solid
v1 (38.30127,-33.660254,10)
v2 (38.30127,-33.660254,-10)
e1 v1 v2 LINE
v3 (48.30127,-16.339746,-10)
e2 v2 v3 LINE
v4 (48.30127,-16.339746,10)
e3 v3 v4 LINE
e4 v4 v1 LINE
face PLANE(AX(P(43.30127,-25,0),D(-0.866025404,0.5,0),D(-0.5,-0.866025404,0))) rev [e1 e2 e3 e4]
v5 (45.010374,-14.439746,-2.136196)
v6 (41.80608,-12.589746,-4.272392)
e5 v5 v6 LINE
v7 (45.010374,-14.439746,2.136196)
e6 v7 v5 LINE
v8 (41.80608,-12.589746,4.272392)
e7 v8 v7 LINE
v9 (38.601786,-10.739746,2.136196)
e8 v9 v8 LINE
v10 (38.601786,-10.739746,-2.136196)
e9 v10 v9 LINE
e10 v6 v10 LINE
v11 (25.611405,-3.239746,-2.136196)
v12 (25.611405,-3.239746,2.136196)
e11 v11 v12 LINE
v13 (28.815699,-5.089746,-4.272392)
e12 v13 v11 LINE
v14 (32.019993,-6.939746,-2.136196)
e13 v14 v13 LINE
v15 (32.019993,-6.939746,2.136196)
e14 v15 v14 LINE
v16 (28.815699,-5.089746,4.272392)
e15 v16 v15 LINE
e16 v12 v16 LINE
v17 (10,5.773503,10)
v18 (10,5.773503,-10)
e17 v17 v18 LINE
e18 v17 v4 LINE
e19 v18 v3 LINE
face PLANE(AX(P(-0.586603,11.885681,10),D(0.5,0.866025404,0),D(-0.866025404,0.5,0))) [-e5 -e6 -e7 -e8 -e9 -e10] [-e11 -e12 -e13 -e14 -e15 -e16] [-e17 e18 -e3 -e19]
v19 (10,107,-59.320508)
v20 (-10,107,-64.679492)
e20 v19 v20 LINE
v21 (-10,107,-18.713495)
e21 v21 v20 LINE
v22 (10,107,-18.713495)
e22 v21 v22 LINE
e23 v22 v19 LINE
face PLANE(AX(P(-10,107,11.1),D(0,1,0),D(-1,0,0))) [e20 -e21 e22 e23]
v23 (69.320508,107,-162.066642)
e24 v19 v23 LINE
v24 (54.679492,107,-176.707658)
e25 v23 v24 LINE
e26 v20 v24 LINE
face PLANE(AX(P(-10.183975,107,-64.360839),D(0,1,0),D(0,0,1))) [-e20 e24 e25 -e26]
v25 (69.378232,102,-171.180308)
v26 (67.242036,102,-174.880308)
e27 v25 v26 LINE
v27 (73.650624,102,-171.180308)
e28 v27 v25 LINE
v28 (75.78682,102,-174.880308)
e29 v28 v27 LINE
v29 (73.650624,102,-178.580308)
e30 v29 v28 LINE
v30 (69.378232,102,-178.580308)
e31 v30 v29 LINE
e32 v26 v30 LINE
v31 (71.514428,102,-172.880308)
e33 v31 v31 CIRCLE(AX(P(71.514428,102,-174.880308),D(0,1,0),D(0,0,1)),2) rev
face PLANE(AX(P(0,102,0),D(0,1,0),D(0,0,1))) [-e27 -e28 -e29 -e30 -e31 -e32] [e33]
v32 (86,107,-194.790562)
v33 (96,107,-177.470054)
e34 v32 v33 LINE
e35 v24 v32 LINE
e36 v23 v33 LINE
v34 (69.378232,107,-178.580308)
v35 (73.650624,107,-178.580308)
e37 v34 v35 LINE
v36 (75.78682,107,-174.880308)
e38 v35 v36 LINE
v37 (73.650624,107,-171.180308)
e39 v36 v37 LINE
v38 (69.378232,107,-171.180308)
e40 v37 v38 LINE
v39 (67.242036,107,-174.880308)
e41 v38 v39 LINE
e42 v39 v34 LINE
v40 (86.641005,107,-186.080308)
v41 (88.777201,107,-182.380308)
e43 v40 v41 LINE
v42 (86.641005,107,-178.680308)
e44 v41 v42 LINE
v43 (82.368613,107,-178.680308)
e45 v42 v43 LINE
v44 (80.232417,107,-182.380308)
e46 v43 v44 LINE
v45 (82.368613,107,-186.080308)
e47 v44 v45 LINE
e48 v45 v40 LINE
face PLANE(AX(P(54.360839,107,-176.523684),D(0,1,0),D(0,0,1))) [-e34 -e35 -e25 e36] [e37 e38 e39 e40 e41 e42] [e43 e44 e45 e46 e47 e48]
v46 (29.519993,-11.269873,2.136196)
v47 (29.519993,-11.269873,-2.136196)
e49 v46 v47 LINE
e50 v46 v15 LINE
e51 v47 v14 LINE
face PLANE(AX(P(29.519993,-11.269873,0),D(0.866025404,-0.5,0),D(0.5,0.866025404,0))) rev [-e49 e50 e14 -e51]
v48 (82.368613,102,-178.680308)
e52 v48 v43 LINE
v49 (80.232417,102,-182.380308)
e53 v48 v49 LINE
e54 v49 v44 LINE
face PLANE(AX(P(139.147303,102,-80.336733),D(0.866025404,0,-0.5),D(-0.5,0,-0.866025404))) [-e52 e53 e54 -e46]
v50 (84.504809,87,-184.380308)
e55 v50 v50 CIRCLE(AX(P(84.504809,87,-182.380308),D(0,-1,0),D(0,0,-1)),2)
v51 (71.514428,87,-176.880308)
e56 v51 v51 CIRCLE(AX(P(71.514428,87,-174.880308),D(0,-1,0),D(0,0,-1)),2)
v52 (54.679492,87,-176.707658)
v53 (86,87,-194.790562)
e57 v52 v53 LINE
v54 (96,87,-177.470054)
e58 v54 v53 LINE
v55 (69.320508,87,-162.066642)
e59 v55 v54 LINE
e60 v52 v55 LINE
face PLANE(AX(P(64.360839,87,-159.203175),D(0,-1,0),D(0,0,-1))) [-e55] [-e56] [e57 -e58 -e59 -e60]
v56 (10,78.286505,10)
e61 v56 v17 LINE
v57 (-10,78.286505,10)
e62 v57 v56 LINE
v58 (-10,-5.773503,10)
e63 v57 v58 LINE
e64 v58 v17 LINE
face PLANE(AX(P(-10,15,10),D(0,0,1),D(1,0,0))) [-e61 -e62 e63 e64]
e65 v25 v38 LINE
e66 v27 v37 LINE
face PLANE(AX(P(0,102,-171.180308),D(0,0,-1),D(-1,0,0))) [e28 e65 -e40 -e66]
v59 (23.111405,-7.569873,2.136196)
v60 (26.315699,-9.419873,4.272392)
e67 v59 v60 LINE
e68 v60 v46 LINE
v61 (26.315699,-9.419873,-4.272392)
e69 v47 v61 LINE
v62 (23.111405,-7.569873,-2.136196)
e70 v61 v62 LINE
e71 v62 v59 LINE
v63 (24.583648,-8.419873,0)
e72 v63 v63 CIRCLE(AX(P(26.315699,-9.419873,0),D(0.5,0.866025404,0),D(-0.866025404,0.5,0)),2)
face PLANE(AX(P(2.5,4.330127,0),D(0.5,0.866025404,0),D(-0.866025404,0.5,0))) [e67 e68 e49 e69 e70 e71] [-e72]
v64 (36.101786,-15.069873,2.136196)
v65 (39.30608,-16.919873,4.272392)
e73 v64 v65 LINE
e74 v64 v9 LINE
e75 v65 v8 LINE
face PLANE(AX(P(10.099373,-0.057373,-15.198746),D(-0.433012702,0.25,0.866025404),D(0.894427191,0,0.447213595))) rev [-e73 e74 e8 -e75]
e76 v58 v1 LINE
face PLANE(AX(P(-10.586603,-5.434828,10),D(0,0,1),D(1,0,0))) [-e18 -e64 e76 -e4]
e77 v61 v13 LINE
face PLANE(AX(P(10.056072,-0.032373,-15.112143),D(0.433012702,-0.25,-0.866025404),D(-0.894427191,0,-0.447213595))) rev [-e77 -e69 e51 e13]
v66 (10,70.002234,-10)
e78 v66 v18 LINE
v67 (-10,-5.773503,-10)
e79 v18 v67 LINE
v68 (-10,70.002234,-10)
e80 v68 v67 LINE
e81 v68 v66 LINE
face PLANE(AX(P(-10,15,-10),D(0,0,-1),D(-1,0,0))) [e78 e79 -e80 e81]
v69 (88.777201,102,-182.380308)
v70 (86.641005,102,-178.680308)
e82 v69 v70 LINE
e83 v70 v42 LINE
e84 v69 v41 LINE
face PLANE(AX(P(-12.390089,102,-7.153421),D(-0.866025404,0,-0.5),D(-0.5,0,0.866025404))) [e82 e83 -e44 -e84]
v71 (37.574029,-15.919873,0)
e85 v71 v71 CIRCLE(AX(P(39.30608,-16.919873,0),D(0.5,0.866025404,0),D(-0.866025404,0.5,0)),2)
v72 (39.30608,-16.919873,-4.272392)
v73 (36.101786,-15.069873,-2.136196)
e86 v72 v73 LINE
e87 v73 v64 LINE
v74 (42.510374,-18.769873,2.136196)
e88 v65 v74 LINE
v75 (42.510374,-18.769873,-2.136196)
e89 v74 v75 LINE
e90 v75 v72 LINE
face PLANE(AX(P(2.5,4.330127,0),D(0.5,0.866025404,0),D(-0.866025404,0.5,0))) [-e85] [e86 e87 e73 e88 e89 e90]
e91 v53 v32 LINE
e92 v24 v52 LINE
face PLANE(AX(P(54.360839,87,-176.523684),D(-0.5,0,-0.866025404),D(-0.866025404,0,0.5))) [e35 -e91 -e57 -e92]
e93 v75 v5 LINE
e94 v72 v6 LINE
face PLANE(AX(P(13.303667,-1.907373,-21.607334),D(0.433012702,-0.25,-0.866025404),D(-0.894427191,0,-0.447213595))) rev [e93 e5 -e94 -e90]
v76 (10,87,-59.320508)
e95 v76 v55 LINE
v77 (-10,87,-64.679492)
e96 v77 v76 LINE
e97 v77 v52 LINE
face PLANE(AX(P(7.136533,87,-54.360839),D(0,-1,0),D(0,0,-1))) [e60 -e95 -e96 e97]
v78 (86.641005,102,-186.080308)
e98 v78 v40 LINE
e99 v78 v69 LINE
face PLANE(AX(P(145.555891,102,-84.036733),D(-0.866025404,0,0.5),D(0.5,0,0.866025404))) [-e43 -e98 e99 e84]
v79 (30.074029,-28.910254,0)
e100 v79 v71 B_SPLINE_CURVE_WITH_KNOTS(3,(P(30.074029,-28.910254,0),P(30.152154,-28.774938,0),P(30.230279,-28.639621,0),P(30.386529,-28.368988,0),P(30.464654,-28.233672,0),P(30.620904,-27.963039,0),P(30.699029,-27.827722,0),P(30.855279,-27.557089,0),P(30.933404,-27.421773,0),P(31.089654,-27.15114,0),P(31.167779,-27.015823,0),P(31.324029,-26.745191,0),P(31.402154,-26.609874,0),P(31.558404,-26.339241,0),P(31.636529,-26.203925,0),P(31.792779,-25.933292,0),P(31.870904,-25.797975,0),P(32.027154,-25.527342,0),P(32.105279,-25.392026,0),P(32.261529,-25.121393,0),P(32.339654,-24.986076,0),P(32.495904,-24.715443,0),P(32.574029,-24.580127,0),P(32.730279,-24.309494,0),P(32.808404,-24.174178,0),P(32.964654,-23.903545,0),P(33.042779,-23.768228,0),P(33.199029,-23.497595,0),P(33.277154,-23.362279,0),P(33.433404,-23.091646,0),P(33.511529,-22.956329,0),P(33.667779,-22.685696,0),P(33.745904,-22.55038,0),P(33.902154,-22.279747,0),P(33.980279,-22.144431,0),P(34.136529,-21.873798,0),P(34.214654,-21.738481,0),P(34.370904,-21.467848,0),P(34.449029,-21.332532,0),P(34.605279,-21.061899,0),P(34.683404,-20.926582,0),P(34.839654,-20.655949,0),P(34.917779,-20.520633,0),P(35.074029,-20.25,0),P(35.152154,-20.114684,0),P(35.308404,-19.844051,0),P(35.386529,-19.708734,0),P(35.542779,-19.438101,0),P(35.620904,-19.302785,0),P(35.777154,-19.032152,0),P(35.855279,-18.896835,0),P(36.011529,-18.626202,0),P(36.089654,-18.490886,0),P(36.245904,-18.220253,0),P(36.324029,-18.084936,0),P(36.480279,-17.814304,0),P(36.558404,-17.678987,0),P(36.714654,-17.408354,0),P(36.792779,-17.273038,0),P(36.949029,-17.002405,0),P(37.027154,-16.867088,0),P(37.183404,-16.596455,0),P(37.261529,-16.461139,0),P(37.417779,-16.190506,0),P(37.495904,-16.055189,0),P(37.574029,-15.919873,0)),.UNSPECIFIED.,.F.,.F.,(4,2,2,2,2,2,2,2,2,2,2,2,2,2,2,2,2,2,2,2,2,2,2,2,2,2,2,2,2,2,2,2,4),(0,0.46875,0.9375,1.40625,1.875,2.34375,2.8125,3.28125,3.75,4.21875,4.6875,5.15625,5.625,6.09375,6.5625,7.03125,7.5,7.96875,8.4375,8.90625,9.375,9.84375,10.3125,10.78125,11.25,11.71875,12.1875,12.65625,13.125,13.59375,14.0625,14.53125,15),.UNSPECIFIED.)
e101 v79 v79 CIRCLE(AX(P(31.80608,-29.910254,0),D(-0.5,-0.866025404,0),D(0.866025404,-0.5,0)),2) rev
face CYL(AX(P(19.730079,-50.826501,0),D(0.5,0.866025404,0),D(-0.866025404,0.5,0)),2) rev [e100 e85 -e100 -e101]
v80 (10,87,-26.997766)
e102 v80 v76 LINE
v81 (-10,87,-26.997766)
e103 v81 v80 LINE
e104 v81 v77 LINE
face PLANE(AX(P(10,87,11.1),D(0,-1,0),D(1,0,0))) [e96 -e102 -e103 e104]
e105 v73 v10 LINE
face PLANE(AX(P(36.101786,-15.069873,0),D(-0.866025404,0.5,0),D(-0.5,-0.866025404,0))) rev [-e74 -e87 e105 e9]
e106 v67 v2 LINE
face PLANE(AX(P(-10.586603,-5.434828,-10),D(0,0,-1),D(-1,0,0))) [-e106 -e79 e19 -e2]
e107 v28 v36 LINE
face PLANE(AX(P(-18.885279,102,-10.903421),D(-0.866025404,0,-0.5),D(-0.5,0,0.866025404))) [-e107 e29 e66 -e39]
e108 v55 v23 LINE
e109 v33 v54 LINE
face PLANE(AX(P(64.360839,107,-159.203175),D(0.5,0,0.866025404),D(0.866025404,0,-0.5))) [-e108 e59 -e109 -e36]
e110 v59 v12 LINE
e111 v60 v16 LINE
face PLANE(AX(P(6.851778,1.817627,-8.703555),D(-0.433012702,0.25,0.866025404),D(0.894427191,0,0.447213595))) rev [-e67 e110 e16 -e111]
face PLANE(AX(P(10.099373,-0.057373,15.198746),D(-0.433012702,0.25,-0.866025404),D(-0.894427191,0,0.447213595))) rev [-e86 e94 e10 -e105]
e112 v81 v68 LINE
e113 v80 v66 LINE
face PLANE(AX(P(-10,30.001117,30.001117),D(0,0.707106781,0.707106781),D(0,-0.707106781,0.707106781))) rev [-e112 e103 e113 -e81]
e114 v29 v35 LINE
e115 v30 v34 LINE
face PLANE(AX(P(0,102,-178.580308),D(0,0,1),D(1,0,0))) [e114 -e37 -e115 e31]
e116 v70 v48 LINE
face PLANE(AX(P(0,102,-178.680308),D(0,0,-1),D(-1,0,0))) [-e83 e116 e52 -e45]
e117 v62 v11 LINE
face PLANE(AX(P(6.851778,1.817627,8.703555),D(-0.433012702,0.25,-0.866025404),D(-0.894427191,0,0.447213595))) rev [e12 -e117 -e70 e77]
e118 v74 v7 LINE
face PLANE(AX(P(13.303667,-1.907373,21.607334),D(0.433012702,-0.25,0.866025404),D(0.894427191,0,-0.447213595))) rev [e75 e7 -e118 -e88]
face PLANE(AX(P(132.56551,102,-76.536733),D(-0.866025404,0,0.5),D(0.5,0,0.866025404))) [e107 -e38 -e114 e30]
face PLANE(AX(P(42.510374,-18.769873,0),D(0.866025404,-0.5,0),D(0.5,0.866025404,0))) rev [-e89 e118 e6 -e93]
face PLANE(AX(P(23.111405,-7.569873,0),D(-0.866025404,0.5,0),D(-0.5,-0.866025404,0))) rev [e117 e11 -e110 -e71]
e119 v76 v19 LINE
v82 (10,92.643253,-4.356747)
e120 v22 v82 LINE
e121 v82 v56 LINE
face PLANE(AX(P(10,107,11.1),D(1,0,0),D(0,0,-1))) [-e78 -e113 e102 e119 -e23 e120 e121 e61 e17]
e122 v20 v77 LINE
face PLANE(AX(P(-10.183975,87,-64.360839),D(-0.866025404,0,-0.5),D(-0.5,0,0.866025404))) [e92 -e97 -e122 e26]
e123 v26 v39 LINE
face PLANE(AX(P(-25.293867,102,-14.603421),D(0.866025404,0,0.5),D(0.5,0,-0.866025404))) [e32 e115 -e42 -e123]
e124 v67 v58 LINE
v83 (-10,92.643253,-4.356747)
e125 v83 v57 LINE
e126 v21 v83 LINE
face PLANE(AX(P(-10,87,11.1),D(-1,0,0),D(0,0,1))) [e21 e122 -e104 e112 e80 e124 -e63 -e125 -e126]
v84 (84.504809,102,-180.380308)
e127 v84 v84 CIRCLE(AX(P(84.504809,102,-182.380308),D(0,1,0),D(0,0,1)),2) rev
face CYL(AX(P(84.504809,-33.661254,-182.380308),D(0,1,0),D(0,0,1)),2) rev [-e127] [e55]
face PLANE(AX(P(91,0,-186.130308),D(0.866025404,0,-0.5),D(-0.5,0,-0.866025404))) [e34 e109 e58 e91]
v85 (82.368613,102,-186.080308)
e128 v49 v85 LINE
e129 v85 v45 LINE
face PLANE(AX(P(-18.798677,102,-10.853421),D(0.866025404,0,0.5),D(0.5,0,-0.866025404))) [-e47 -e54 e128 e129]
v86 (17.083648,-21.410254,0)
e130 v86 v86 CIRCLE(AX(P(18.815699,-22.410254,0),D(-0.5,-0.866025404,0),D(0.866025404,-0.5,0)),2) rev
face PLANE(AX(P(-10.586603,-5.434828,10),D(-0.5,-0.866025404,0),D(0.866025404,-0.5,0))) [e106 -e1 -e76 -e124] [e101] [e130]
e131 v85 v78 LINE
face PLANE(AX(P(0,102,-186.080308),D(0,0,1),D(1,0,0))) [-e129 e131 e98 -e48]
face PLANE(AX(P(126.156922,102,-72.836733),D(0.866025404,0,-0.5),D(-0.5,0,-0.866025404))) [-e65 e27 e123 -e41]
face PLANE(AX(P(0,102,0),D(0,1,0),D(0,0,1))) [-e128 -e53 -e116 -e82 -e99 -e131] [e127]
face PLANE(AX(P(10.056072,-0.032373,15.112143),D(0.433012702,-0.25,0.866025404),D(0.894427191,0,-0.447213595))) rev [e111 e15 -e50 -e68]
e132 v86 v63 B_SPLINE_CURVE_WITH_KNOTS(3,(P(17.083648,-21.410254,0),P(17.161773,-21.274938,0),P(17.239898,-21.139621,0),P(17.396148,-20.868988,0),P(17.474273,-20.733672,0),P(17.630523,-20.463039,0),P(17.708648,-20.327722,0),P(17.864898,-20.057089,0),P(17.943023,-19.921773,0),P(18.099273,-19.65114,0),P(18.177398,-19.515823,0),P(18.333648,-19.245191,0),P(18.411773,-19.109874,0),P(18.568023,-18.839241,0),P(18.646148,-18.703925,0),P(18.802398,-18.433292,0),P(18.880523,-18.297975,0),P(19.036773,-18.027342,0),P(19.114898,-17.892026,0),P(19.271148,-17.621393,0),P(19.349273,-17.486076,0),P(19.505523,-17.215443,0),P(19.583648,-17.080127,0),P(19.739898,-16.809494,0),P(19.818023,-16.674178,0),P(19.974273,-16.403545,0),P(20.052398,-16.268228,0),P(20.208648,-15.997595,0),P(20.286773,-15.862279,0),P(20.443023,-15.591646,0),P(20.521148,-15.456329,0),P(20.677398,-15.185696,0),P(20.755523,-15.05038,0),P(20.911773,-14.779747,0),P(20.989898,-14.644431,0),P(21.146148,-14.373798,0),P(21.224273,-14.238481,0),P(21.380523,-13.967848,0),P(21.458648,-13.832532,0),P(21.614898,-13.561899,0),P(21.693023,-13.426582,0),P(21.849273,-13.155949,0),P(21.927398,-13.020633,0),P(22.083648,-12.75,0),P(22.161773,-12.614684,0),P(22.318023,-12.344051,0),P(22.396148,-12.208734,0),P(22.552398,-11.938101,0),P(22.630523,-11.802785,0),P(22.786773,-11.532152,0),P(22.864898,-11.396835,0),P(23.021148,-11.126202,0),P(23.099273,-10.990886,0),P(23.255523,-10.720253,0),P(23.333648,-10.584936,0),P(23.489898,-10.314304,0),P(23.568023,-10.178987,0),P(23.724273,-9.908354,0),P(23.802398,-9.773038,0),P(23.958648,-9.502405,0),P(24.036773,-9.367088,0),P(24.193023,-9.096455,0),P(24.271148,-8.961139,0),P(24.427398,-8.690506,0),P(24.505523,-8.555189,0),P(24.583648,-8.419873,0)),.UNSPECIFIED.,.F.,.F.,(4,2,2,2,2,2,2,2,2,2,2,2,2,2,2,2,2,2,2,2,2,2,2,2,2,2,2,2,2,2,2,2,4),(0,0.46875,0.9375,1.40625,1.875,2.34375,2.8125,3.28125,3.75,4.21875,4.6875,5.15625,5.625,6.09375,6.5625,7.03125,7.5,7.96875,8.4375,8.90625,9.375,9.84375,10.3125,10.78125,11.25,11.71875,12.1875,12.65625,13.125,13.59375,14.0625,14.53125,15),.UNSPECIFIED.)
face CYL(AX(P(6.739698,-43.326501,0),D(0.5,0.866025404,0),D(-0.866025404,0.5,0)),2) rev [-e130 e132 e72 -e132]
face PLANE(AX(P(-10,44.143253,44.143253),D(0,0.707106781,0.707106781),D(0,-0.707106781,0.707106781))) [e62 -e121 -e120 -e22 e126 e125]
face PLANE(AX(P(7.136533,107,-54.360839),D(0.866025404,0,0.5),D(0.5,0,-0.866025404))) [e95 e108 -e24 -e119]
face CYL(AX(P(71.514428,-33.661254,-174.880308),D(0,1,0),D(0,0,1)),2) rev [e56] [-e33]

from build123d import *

# Parameters (mm, degrees)
SKETCH4_W           = 20
SKETCH4_H           = 20
SWEEP2_START        = -10
SWEEP2_OUTLINE_W    = 20
SWEEP2_OUTLINE_H    = 92
SWEEP2_DEPTH        = 20
SWEEP2_START_2      = -15
SWEEP2_2_OUTLINE_W  = 20
SWEEP2_2_OUTLINE_H  = 20
SWEEP2_2_DEPTH      = 5
SWEEP3_START        = 87
SWEEP3_DEPTH        = 20
CUT_EXTRUDE3_REACH  = 238.421
SKETCH5_R           = 2
SKETCH5_3_R         = 2
CUT_EXTRUDE4_DEPTH  = 5
CUT_EXTRUDE5_REACH  = 208.616
SKETCH6_R           = 2
SKETCH6_5_R         = 2
CUT_EXTRUDE6_DEPTH  = 5
CUT_EXTRUDE7_DEPTH  = 239.303090645
BOSS_EXTRUDE1_DEPTH = 20


# Read off the part's stored shape, not the designer's step: Sweep2, Sweep3
with BuildPart() as part:
    # Sweep1: sweep along a path in Sketch1
    with BuildLine(Plane.XY) as sweep1_path:
        Line((43.301270189, -25), (0, 0))
        Line((0, 0), (0, 15))
    # Sketch4 → Sweep1 (sweep)
    with BuildSketch(Plane(origin=(43.301270189, -25, 0), x_dir=(0, 0, -1), z_dir=(0.8660254037844382, -0.5000000000000011, 0))):
        Rectangle(SKETCH4_W, SKETCH4_H)
    sweep(path=sweep1_path.line, transition=Transition.RIGHT)

    # Sweep2 outline → Sweep2 (add)
    with BuildSketch(Plane.XY.offset(SWEEP2_START)):
        with Locations((0, 61)):
            Rectangle(SWEEP2_OUTLINE_W, SWEEP2_OUTLINE_H)
    extrude(amount=SWEEP2_DEPTH)

    # Sweep2 2 outline → Sweep2 2 (add)
    with BuildSketch(Plane.XY.offset(SWEEP2_START_2)):
        with Locations((0, 97)):
            Rectangle(SWEEP2_2_OUTLINE_W, SWEEP2_2_OUTLINE_H)
    extrude(amount=SWEEP2_2_DEPTH)

    # Sweep3 outline → Sweep3 (add)
    with BuildSketch(Plane(origin=(0, 0, 0), x_dir=(1, 0, 0), z_dir=(0, 1, 0)).offset(SWEEP3_START)):
        Polygon((54.679491924, 176.707658145), (-10, 64.679491924), (-10, 15), (10, 15), (10, 59.320508076), (69.320508076, 162.066641994), (96, 177.470053838), (86, 194.790561914), align=None)
    extrude(amount=SWEEP3_DEPTH)

    # Sketch5 → Cut-Extrude3 (cut, up to next)
    with BuildSketch(Plane(origin=(5, 8.660254038, 0), x_dir=(0.8660254037844382, -0.500000000000001, 0), z_dir=(0.5000000000000009, 0.866025403784438, 0)), mode=Mode.PRIVATE) as cut_extrude3_sk1:
        with Locations(Location((27.5, 0, 0), (0, 0, 180))):
            Circle(SKETCH5_R)
    cut_extrude3_tool1 = extrude(cut_extrude3_sk1.sketch, amount=-CUT_EXTRUDE3_REACH, mode=Mode.PRIVATE) & part.part
    # Sketch5 → Cut-Extrude3 (cut, up to next)
    with BuildSketch(Plane(origin=(5, 8.660254038, 0), x_dir=(0.8660254037844382, -0.500000000000001, 0), z_dir=(0.5000000000000009, 0.866025403784438, 0)), mode=Mode.PRIVATE) as cut_extrude3_sk2:
        with Locations(Location((42.5, 0, 0), (0, 0, 180))):
            Circle(SKETCH5_R)
    cut_extrude3_tool2 = extrude(cut_extrude3_sk2.sketch, amount=-CUT_EXTRUDE3_REACH, mode=Mode.PRIVATE) & part.part
    add(cut_extrude3_tool1.solids().sort_by_distance((28.815699, -5.089746, 0))[0], mode=Mode.SUBTRACT)
    add(cut_extrude3_tool2.solids().sort_by_distance((41.80608, -12.589746, 0))[0], mode=Mode.SUBTRACT)

    # Sketch5<3> → Cut-Extrude4 (cut)
    # profile 1 of 2: a face of its own
    with BuildSketch(Plane(origin=(5, 8.660254038, 0), x_dir=(0.8660254037844382, -0.500000000000001, 0), z_dir=(0.5000000000000009, 0.866025403784438, 0))):
        Polygon((31.2, -2.136195996), (31.2, 2.136195996), (27.5, 4.272391992), (23.8, 2.136195996), (23.8, -2.136195996), (27.5, -4.272391992), align=None)
        with Locations(Location((27.5, 0, 0), (0, 0, 180))):
            Circle(SKETCH5_3_R, mode=Mode.SUBTRACT)
    # profile 2 of 2: a face of its own
    with BuildSketch(Plane(origin=(5, 8.660254038, 0), x_dir=(0.8660254037844382, -0.500000000000001, 0), z_dir=(0.5000000000000009, 0.866025403784438, 0))):
        Polygon((46.2, -2.136195996), (46.2, 2.136195996), (42.5, 4.272391992), (38.8, 2.136195996), (38.8, -2.136195996), (42.5, -4.272391992), align=None)
        with Locations(Location((42.5, 0, 0), (0, 0, 180))):
            Circle(SKETCH5_3_R, mode=Mode.SUBTRACT)
    extrude(amount=-CUT_EXTRUDE4_DEPTH, mode=Mode.SUBTRACT)

    # Sketch6 → Cut-Extrude5 (cut, up to next)
    with BuildSketch(Plane(origin=(0, 107, -107), x_dir=(1, 0, 0), z_dir=(0, -1, 0)), mode=Mode.PRIVATE) as cut_extrude5_sk1:
        with Locations(Location((71.514428415, -67.880307876, 0), (0, 0, 90))):
            Circle(SKETCH6_R)
    cut_extrude5_tool1 = extrude(cut_extrude5_sk1.sketch, amount=CUT_EXTRUDE5_REACH, mode=Mode.PRIVATE) & part.part
    # Sketch6 → Cut-Extrude5 (cut, up to next)
    with BuildSketch(Plane(origin=(0, 107, -107), x_dir=(1, 0, 0), z_dir=(0, -1, 0)), mode=Mode.PRIVATE) as cut_extrude5_sk2:
        with Locations(Location((84.504809472, -75.380307876, 0), (0, 0, 90))):
            Circle(SKETCH6_R)
    cut_extrude5_tool2 = extrude(cut_extrude5_sk2.sketch, amount=CUT_EXTRUDE5_REACH, mode=Mode.PRIVATE) & part.part
    add(cut_extrude5_tool1.solids().sort_by_distance((71.514428, 107, -174.880308))[0], mode=Mode.SUBTRACT)
    add(cut_extrude5_tool2.solids().sort_by_distance((84.504809, 107, -182.380308))[0], mode=Mode.SUBTRACT)

    # Sketch6<5> → Cut-Extrude6 (cut)
    # profile 1 of 2: a face of its own
    with BuildSketch(Plane(origin=(0, 107, -107), x_dir=(1, 0, 0), z_dir=(0, -1, 0))):
        Polygon((75.786820407, -67.880307876), (73.650624411, -64.180307876), (69.378232419, -64.180307876), (67.242036423, -67.880307876), (69.378232419, -71.580307876), (73.650624411, -71.580307876), align=None)
        with Locations(Location((71.514428415, -67.880307876, 0), (0, 0, 90))):
            Circle(SKETCH6_5_R, mode=Mode.SUBTRACT)
    # profile 2 of 2: a face of its own
    with BuildSketch(Plane(origin=(0, 107, -107), x_dir=(1, 0, 0), z_dir=(0, -1, 0))):
        Polygon((88.777201464, -75.380307876), (86.641005468, -71.680307876), (82.368613476, -71.680307876), (80.23241748, -75.380307876), (82.368613476, -79.080307876), (86.641005468, -79.080307876), align=None)
        with Locations(Location((84.504809472, -75.380307876, 0), (0, 0, 90))):
            Circle(SKETCH6_5_R, mode=Mode.SUBTRACT)
    extrude(amount=CUT_EXTRUDE6_DEPTH, mode=Mode.SUBTRACT)

    # Sketch7 → Cut-Extrude7 (cut, through all)
    with BuildSketch(Plane(origin=(10, 0, 0), x_dir=(0, 0, -1), z_dir=(1, 0, 0))):
        Polygon((4.356747298, 92.643252702), (-10, 107), (-10, 78.286505404), align=None)
        Polygon((18.713494596, 107), (-10, 107), (4.356747298, 92.643252702), align=None)
    extrude(amount=-CUT_EXTRUDE7_DEPTH, mode=Mode.SUBTRACT)

    # Sketch7<3> → Boss-Extrude1 (add, through all)
    with BuildSketch(Plane(origin=(10, 0, 0), x_dir=(0, 0, -1), z_dir=(1, 0, 0))):
        Polygon((26.997765843, 87), (10, 87), (10, 70.002234157), align=None)
    extrude(amount=-BOSS_EXTRUDE1_DEPTH)


solid = part.part
